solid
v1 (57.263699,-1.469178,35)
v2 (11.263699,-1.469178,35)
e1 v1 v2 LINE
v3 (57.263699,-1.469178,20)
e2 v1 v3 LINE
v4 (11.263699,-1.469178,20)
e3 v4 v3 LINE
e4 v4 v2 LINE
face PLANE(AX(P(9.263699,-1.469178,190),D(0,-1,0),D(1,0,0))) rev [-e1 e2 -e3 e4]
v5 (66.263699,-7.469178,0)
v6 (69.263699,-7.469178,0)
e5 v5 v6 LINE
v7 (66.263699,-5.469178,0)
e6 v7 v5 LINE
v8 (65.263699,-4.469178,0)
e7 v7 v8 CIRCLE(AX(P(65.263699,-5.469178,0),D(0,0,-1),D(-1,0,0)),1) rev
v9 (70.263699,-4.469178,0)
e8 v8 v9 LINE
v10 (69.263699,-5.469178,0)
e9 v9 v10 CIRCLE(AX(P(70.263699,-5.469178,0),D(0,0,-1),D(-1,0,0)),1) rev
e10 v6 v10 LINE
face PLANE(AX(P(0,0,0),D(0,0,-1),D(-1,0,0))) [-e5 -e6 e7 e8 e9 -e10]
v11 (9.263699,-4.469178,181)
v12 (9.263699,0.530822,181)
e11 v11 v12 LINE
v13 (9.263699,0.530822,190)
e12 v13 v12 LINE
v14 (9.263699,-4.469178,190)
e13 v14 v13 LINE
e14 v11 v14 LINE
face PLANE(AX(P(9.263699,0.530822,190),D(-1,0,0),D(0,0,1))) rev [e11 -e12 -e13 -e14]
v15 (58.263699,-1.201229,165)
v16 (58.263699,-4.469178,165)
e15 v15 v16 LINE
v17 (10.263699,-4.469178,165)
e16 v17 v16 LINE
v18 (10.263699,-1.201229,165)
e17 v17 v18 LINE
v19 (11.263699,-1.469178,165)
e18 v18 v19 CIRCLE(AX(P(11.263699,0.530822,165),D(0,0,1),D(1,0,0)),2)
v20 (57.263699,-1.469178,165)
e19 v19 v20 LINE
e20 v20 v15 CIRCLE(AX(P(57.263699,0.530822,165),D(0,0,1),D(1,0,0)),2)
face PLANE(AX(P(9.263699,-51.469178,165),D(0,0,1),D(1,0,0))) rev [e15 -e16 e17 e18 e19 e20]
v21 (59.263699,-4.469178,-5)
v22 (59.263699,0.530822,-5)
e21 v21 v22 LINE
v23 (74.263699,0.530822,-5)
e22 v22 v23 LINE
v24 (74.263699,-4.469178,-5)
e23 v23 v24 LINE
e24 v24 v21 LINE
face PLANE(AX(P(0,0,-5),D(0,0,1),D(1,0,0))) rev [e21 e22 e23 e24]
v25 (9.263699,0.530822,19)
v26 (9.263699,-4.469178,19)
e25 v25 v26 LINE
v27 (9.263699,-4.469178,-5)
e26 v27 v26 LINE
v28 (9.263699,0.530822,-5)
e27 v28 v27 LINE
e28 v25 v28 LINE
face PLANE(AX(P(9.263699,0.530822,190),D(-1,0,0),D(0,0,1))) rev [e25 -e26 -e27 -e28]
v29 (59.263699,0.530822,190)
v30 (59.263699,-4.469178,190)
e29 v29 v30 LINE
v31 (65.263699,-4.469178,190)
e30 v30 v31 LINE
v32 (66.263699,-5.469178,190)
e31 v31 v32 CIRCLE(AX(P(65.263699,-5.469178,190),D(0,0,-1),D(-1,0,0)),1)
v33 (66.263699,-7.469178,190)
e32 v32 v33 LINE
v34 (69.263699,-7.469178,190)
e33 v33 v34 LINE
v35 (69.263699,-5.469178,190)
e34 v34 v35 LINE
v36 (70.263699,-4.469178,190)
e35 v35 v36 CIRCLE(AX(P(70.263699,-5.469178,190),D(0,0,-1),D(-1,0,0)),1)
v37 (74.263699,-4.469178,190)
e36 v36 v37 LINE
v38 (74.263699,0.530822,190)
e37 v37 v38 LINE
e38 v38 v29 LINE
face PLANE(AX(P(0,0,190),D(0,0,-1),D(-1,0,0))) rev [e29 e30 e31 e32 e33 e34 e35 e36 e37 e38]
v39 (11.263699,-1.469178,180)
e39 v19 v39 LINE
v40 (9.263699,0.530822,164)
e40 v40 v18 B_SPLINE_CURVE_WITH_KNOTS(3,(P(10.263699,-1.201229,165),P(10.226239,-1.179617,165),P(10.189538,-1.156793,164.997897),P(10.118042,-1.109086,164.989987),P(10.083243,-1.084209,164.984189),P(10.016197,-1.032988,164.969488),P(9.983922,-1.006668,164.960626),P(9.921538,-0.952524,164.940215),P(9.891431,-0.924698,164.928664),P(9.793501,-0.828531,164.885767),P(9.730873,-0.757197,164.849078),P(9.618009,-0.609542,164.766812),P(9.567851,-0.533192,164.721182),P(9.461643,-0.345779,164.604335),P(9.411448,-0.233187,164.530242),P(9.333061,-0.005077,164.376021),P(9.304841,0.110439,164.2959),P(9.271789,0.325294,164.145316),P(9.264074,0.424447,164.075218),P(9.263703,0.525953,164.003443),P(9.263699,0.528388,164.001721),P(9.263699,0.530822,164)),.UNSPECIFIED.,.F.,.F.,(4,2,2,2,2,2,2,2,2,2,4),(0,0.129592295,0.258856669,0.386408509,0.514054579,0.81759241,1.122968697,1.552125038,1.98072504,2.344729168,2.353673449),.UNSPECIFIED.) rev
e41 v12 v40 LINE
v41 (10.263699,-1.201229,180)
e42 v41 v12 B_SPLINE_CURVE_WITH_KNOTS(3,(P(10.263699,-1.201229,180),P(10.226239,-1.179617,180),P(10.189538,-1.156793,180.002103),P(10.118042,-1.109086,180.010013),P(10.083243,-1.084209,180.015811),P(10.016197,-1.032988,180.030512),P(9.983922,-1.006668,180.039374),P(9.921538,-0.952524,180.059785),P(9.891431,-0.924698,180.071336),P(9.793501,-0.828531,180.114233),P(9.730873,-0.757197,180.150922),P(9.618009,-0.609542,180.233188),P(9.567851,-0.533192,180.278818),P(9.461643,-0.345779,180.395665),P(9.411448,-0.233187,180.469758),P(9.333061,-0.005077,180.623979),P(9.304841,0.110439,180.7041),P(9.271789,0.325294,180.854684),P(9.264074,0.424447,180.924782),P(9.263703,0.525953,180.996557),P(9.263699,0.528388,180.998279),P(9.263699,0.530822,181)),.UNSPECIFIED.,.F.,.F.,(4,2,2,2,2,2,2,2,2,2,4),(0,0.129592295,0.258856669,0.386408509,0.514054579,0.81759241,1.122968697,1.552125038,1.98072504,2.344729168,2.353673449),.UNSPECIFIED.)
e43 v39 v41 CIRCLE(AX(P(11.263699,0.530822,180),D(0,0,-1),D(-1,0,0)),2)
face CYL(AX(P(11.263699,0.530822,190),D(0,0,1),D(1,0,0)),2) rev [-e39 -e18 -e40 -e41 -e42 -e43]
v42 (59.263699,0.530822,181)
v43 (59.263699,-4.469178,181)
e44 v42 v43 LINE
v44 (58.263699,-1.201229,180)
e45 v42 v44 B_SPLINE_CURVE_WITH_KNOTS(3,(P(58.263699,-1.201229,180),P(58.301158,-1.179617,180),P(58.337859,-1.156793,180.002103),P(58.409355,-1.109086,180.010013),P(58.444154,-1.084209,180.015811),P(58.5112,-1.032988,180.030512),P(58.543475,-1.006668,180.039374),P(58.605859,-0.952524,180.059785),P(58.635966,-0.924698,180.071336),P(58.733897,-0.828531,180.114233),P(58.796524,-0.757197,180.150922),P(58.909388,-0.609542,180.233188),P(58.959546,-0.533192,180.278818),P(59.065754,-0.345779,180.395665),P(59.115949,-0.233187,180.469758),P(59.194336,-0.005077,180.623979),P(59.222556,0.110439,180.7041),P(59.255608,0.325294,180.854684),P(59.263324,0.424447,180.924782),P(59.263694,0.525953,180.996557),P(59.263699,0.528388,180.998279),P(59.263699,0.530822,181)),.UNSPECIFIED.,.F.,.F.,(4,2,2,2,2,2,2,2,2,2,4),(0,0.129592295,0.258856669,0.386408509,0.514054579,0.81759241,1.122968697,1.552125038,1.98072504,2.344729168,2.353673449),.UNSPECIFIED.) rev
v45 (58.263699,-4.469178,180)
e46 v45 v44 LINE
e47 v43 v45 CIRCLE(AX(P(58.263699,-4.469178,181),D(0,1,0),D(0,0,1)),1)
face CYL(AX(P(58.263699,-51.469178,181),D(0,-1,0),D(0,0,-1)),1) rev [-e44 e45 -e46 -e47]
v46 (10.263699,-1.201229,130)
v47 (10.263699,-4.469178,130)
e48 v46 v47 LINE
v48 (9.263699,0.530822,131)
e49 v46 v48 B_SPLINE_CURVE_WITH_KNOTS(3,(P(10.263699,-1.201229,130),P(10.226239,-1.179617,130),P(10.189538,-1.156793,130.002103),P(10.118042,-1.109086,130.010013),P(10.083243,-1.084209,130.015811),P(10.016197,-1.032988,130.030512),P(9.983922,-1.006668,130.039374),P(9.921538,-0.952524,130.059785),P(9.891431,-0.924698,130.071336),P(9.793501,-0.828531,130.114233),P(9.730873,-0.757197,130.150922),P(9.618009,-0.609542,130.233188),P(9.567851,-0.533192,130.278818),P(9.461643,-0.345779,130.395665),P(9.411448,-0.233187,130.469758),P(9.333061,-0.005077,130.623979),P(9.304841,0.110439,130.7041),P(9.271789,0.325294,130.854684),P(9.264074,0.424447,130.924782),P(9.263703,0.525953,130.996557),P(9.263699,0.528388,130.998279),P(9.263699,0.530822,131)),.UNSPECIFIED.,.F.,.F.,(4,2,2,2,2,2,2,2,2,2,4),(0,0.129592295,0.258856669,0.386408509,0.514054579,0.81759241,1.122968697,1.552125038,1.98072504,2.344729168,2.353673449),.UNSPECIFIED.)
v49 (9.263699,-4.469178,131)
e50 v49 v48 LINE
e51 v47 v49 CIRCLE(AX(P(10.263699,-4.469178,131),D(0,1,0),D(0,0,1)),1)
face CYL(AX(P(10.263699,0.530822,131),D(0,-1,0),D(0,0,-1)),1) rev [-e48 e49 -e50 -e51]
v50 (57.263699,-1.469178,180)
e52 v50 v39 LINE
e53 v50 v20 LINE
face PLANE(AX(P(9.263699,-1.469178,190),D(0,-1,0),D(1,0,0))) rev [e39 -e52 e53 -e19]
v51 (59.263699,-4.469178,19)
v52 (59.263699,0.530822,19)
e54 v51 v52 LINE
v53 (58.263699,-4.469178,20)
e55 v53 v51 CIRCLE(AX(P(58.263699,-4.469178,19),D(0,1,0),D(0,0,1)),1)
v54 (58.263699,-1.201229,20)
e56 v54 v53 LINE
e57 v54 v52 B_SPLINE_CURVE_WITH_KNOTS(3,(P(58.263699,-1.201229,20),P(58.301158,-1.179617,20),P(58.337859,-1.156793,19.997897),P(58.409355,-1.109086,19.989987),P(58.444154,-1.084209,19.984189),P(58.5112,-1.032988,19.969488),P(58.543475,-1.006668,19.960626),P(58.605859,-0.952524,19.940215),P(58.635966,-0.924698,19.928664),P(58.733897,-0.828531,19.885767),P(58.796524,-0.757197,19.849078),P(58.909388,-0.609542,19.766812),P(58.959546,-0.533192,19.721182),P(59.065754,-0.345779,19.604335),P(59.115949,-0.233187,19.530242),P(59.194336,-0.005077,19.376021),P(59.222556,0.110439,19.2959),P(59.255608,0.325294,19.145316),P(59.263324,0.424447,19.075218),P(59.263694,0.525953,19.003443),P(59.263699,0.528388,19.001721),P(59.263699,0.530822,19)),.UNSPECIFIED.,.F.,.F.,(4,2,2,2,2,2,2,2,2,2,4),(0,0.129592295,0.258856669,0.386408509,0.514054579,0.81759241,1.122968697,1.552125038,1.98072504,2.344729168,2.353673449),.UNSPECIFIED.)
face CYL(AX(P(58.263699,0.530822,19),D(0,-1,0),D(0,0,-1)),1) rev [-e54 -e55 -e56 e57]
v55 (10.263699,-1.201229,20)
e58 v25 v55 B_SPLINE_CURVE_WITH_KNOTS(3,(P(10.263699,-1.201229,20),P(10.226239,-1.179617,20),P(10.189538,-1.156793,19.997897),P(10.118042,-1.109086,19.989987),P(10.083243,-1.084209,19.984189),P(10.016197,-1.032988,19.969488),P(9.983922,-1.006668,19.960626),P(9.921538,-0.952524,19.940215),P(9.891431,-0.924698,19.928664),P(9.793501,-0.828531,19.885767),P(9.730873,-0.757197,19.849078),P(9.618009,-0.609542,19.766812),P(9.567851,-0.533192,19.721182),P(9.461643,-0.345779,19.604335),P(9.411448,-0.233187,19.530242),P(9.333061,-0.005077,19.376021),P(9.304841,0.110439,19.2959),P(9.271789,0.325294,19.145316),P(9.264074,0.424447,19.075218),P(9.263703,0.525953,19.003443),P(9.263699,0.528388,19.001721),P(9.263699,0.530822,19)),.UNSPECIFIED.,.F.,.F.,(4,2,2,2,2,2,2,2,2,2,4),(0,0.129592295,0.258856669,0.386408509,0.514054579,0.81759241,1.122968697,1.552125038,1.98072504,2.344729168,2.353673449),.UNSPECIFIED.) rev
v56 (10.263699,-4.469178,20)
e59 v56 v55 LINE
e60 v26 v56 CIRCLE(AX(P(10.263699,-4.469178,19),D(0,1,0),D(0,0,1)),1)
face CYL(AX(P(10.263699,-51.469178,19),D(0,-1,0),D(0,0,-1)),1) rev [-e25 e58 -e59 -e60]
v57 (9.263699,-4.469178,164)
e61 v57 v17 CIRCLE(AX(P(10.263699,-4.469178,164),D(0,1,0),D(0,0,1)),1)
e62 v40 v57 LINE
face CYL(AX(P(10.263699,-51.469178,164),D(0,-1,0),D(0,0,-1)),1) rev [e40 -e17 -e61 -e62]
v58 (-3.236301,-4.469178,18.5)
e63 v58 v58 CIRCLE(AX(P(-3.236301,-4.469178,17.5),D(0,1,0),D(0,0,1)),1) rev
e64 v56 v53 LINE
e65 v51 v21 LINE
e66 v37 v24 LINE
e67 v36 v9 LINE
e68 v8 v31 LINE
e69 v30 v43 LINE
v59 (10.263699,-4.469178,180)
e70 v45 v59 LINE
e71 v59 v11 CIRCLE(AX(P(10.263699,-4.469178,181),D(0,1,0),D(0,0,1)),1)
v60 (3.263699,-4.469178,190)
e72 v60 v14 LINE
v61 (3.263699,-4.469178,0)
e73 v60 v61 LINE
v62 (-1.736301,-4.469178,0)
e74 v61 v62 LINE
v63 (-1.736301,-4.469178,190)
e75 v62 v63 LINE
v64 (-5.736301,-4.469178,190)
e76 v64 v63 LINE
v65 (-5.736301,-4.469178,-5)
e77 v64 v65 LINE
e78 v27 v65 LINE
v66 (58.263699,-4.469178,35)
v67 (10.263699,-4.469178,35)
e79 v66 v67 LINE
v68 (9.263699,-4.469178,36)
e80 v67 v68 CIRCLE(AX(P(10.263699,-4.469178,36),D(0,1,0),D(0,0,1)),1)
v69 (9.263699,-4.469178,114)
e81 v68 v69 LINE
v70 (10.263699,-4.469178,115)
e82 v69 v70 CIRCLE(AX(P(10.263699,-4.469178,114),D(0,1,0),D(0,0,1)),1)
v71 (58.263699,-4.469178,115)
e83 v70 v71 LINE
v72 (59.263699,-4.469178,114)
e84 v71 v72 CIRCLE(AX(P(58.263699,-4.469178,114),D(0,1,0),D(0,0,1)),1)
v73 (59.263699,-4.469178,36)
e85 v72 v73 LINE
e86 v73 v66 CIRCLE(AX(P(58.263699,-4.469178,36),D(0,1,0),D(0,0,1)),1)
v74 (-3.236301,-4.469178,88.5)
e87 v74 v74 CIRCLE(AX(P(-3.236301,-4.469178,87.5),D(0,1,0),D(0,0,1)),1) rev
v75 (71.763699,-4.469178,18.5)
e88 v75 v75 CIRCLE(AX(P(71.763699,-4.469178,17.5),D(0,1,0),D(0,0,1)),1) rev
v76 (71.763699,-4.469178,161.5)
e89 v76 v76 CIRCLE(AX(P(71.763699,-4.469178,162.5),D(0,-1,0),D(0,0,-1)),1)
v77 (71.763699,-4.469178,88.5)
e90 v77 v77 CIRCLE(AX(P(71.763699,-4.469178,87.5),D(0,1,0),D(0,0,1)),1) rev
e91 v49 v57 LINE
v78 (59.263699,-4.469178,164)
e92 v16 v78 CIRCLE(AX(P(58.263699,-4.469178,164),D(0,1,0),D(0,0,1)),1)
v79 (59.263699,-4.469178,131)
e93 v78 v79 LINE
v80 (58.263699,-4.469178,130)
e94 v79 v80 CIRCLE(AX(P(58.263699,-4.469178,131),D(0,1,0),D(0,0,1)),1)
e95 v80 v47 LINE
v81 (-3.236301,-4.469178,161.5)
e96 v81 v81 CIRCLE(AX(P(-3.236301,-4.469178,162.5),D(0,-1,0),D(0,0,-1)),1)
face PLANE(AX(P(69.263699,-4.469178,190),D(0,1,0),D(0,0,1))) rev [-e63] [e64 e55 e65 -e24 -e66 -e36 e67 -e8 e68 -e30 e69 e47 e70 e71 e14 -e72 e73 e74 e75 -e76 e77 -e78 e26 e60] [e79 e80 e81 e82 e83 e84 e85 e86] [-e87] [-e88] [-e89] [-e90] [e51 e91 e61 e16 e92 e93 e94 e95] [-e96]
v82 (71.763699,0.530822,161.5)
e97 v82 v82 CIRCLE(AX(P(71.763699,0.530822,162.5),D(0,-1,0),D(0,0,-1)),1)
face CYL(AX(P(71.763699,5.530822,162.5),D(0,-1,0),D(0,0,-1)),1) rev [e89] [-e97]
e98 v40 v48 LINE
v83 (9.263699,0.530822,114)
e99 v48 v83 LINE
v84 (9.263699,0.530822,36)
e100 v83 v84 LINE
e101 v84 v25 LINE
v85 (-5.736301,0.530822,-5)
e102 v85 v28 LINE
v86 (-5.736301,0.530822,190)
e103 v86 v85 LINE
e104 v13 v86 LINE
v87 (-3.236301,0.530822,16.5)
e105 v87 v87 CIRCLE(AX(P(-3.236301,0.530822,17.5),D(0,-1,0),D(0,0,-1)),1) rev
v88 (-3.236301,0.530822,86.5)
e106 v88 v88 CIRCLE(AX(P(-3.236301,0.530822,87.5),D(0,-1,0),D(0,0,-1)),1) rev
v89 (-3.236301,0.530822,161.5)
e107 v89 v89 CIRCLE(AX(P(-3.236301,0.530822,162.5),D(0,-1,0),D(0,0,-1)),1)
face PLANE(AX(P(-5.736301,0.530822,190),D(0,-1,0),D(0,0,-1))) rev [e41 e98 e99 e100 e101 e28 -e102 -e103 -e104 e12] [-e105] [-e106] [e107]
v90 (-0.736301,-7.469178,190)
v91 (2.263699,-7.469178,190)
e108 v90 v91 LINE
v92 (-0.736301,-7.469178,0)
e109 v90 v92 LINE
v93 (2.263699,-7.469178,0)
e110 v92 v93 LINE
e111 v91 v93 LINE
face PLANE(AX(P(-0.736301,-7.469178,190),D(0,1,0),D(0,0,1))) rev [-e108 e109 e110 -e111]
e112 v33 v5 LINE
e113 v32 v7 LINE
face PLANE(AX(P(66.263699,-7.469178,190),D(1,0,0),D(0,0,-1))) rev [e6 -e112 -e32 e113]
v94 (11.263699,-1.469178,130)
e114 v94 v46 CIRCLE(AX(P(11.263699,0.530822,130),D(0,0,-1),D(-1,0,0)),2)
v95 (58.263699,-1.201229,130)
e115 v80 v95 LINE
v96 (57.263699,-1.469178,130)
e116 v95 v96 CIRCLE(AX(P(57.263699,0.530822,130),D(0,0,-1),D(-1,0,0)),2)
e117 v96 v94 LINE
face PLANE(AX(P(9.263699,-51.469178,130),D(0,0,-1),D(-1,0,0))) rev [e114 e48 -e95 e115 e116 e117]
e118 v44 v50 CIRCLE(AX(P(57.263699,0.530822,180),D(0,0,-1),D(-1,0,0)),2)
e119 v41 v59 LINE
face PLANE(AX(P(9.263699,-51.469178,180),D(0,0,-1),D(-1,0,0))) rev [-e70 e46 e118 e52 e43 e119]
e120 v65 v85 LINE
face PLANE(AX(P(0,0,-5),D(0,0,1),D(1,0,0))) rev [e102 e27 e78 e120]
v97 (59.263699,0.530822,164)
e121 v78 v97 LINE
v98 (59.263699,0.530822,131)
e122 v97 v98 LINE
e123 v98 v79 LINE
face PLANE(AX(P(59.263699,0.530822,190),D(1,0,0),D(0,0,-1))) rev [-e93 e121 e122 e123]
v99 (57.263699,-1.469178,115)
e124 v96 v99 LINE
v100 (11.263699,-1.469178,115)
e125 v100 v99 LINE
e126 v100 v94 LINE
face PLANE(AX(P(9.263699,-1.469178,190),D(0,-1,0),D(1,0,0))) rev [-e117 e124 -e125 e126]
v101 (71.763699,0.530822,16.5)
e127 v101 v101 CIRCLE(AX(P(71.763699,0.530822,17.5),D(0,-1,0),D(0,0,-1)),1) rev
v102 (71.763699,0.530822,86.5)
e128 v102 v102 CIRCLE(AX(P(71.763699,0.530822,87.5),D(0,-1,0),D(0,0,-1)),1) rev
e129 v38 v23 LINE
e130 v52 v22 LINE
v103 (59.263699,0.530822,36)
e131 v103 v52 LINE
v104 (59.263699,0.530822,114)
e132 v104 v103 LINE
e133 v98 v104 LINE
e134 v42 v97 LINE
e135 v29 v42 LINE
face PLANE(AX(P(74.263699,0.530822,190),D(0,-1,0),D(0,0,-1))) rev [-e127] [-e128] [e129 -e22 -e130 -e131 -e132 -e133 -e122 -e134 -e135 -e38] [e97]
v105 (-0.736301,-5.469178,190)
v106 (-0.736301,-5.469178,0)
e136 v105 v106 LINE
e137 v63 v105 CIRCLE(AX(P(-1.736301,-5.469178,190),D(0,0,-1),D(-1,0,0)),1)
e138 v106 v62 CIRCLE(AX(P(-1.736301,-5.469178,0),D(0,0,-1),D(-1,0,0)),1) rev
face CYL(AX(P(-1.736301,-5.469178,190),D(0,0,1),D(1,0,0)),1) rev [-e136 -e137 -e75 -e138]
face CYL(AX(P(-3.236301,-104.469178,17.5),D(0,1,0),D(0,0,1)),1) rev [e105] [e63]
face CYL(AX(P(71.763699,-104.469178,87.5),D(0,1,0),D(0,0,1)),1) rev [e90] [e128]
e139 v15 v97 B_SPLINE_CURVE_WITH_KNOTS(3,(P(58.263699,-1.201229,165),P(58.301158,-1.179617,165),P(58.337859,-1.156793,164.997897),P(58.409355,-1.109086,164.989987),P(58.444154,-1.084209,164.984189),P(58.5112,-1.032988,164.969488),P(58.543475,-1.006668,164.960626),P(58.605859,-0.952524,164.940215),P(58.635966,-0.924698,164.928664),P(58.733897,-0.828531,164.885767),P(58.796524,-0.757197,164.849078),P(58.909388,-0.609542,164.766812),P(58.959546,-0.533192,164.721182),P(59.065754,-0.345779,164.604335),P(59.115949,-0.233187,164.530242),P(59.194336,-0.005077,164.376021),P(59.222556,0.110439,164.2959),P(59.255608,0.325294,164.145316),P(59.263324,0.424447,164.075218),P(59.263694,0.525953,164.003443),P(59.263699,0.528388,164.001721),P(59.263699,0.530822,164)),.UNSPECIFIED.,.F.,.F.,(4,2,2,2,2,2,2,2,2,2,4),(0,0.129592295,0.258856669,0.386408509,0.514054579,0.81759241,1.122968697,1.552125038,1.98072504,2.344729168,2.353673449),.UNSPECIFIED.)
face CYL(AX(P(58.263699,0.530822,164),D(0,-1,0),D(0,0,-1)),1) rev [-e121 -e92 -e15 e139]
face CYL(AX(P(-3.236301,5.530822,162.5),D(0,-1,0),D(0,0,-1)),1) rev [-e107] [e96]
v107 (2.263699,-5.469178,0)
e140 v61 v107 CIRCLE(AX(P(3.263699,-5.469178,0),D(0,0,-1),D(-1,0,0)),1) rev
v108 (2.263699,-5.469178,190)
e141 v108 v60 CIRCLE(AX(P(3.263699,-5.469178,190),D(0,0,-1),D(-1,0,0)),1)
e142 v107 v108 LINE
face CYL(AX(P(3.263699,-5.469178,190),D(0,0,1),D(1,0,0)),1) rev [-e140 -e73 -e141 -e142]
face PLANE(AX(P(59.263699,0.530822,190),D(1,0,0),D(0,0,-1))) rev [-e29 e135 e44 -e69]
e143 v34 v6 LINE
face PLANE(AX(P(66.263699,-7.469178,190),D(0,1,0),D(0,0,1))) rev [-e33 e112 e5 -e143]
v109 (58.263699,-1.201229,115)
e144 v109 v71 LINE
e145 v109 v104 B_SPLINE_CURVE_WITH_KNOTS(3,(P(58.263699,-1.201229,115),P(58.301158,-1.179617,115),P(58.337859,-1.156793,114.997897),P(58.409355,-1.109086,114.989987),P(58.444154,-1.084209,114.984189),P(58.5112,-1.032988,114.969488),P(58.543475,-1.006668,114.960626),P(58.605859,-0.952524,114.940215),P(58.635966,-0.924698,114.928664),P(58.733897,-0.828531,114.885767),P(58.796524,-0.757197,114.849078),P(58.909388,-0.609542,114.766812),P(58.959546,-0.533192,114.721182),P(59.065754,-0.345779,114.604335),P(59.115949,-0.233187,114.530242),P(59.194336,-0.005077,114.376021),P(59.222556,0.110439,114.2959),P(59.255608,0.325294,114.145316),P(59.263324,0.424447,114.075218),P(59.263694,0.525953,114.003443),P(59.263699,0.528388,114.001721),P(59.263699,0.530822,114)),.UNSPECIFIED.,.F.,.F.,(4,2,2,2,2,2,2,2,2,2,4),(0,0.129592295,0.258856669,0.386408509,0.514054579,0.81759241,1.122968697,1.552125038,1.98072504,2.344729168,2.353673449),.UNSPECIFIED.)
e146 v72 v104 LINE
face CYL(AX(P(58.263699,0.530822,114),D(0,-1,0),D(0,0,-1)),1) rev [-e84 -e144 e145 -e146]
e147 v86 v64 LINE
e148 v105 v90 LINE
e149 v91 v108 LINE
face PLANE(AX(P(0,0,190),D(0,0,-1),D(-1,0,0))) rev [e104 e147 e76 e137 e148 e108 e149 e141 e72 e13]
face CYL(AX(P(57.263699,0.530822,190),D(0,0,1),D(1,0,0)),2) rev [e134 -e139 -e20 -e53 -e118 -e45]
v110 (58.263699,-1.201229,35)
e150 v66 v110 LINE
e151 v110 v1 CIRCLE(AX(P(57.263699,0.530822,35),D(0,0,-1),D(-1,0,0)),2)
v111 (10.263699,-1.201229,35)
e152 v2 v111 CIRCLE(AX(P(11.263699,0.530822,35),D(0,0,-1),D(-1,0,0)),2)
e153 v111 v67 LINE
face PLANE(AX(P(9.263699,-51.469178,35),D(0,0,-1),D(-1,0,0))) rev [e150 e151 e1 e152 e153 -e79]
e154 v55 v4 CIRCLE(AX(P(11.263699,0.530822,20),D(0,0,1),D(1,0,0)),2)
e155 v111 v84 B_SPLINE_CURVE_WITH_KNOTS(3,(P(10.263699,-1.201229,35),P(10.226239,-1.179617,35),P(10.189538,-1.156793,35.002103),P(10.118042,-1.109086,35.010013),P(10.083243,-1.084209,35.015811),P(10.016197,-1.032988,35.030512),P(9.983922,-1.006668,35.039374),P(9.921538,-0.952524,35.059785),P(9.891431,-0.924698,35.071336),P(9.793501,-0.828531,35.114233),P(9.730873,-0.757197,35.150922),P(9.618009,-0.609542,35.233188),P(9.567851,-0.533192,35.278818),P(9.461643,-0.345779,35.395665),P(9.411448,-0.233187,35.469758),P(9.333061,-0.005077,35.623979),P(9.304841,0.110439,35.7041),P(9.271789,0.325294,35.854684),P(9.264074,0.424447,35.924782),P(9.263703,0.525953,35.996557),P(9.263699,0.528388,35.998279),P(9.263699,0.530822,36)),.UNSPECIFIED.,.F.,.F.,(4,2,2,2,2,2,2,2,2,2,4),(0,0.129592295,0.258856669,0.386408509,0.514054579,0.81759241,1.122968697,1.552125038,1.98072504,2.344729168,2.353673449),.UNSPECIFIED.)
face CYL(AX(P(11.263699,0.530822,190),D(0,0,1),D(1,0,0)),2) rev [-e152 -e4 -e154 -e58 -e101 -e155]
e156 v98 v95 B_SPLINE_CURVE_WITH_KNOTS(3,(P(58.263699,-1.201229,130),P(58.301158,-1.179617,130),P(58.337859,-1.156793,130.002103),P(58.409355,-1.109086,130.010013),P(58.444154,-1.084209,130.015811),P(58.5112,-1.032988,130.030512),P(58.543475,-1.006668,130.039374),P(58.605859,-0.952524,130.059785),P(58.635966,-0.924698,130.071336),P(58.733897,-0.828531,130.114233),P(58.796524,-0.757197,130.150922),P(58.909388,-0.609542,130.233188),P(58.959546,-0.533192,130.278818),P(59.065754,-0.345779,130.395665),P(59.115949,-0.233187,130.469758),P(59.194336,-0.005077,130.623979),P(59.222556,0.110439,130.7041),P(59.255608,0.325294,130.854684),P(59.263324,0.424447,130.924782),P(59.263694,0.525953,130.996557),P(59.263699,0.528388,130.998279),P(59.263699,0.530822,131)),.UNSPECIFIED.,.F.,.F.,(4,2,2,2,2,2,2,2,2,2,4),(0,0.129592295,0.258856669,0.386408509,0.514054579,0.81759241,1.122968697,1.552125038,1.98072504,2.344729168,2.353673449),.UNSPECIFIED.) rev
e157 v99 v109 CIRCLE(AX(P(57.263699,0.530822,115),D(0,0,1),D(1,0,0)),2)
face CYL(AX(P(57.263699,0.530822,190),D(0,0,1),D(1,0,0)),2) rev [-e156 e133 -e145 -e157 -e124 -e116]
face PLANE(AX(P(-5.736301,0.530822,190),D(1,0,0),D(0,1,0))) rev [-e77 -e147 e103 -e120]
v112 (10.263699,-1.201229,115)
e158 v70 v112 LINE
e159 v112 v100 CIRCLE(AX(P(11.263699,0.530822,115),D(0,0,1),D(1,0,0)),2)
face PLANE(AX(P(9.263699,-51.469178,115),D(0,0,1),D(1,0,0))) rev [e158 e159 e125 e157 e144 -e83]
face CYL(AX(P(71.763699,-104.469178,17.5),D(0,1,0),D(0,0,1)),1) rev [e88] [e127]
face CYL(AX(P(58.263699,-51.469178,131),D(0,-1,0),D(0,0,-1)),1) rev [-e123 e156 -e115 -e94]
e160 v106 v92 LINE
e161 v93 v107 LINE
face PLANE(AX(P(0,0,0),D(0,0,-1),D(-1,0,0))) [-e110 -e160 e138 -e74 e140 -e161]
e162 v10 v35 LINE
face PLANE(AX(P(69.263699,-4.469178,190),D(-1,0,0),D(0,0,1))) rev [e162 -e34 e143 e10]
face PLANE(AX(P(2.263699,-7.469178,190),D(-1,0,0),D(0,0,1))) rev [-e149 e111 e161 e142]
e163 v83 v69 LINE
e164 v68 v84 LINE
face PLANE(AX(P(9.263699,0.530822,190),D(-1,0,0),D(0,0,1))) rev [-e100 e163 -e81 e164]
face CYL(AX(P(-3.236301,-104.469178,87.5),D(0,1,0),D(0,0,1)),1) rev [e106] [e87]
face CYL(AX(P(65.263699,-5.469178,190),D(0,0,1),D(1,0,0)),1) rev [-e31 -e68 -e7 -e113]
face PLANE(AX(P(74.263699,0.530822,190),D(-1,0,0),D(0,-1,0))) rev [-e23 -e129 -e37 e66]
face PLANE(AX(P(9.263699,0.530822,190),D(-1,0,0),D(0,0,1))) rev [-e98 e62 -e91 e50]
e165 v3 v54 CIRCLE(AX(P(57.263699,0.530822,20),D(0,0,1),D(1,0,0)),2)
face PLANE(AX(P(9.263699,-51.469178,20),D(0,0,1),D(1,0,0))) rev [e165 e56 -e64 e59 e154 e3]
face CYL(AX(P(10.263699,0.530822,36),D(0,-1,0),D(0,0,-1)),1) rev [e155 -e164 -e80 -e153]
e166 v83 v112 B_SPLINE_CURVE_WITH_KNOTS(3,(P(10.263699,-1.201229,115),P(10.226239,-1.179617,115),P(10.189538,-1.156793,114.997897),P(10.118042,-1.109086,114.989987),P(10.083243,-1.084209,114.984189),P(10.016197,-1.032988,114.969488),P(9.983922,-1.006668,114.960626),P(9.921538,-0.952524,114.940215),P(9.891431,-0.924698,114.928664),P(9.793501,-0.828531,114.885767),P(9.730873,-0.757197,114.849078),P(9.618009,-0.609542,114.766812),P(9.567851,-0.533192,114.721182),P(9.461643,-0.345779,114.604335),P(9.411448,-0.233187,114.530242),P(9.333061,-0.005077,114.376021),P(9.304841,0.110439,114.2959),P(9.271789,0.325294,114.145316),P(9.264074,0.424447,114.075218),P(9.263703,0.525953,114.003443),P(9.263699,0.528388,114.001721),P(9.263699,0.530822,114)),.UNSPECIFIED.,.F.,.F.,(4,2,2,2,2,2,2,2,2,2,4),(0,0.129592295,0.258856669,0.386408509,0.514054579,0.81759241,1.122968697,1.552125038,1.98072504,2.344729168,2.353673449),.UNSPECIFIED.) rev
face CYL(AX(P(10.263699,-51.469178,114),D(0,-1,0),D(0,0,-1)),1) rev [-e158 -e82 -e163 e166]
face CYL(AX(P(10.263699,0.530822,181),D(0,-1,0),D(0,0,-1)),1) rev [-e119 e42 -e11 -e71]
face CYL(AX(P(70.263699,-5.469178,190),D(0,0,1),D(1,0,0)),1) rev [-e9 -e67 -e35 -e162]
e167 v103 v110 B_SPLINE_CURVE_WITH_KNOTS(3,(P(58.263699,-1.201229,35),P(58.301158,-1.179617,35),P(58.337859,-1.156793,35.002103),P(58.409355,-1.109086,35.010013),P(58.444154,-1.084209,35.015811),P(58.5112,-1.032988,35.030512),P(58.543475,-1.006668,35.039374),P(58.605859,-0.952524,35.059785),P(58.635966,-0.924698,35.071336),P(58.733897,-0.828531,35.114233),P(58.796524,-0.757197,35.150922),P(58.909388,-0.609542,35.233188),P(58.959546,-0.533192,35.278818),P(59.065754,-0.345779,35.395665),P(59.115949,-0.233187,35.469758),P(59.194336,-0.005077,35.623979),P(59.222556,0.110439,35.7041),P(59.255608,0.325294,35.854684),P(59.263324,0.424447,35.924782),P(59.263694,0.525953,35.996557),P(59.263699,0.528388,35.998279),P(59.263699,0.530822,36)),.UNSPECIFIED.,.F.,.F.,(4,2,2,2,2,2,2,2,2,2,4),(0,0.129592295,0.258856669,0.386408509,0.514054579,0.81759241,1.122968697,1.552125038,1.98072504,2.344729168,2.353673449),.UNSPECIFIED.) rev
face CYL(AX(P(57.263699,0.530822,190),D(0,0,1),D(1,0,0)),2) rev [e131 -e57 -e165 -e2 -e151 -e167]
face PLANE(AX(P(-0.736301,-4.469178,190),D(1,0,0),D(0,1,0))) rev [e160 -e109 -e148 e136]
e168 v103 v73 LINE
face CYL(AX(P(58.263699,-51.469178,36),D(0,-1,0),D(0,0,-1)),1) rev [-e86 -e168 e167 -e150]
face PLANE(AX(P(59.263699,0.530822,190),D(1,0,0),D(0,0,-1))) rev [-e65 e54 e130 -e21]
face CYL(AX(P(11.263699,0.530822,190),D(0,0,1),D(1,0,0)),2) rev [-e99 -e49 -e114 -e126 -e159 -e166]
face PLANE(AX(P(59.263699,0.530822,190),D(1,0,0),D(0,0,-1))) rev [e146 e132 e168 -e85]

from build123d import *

# Parameters (mm, degrees)
BOSS_EXTRUDE1_DEPTH     = 190
SKETCH2_W               = 50
SKETCH2_H               = 20
CUT_EXTRUDE1_DEPTH      = 50
SKETCH3_W               = 50
SKETCH3_H               = 80
CUT_EXTRUDE2_DEPTH      = 50
SKETCH4_W               = 50
SKETCH4_H               = 35
CUT_EXTRUDE4_DEPTH      = 50
SKETCH9_W               = 15
SKETCH9_H               = 5
BOSS_EXTRUDE4_DEPTH     = 5
SKETCH5_R               = 1
CUT_EXTRUDE5_DEPTH      = 10
CUT_EXTRUDE6_DEPTH      = 100
CUT_EXTRUDE6_DEPTH_BACK = 10
SKETCH6_R               = 1
FILLET1_R               = 1
FILLET2_R               = 2


with BuildPart() as part:
    # Sketch1 → Boss-Extrude1 (new body)
    with BuildSketch(Plane.XY):
        Polygon((-5.73630137, 0.530821918), (9.26369863, 0.530821918), (9.26369863, -1.469178082), (59.26369863, -1.469178082), (59.26369863, 0.530821918), (74.26369863, 0.530821918), (74.26369863, -4.469178082), (69.26369863, -4.469178082), (69.26369863, -7.469178082), (66.26369863, -7.469178082), (66.26369863, -4.469178082), (2.26369863, -4.469178082), (2.26369863, -7.469178082), (-0.73630137, -7.469178082), (-0.73630137, -4.469178082), (-5.73630137, -4.469178082), align=None)
    extrude(amount=BOSS_EXTRUDE1_DEPTH)

    # Sketch2 → Cut-Extrude1 (cut)
    with BuildSketch(Plane(origin=(0, -1.469178082, 0), x_dir=(1, 0, 0), z_dir=(0, 1, 0))):
        with Locations((34.26369863, -10)):
            Rectangle(SKETCH2_W, SKETCH2_H)
        with Locations((34.26369863, -190)):
            Rectangle(SKETCH2_W, SKETCH2_H)
    extrude(amount=-CUT_EXTRUDE1_DEPTH, mode=Mode.SUBTRACT)

    # Sketch3 → Cut-Extrude2 (cut)
    with BuildSketch(Plane(origin=(0, -1.469178082, 0), x_dir=(1, 0, 0), z_dir=(0, 1, 0))):
        with Locations((34.26369863, -75)):
            Rectangle(SKETCH3_W, SKETCH3_H)
    extrude(amount=-CUT_EXTRUDE2_DEPTH, mode=Mode.SUBTRACT)

    # Sketch4 → Cut-Extrude4 (cut)
    with BuildSketch(Plane(origin=(0, -1.469178082, 0), x_dir=(1, 0, 0), z_dir=(0, 1, 0))):
        with Locations((34.26369863, -147.5)):
            Rectangle(SKETCH4_W, SKETCH4_H)
    extrude(amount=-CUT_EXTRUDE4_DEPTH, mode=Mode.SUBTRACT)

    # Sketch9 → Boss-Extrude4 (add)
    with BuildSketch(Plane(origin=(0, 0, 0), x_dir=(-1, 0, 0), z_dir=(0, 0, -1))):
        with Locations((-66.76369863, -1.969178082)):
            Rectangle(SKETCH9_W, SKETCH9_H)
        with Locations((-1.76369863, -1.969178082)):
            Rectangle(SKETCH9_W, SKETCH9_H)
    extrude(amount=BOSS_EXTRUDE4_DEPTH)

    # Sketch5 → Cut-Extrude5 (cut)
    with BuildSketch(Plane(origin=(0, -4.469178082, 0), x_dir=(-1, 0, 0), z_dir=(0, -1, 0))):
        with Locations(Location((-71.76369863, -162.5, 0), (0, 0, 90))):
            Circle(SKETCH5_R)
        with Locations(Location((3.23630137, -162.5, 0), (0, 0, 90))):
            Circle(SKETCH5_R)
    extrude(amount=-CUT_EXTRUDE5_DEPTH, mode=Mode.SUBTRACT)

    # Sketch6 → Cut-Extrude6 (cut, two sides: drawn at the far end of the back side and taken through both)
    with BuildSketch(Plane(origin=(0, -4.469178082, 0), x_dir=(-1, 0, 0), z_dir=(0, -1, 0)).offset(-CUT_EXTRUDE6_DEPTH_BACK)):
        with Locations(Location((3.23630137, -87.5, 0), (0, 0, 270))):
            Circle(SKETCH6_R)
        with Locations(Location((3.23630137, -17.5, 0), (0, 0, 270))):
            Circle(SKETCH6_R)
        with Locations(Location((-71.76369863, -17.5, 0), (0, 0, 270))):
            Circle(SKETCH6_R)
        with Locations(Location((-71.76369863, -87.5, 0), (0, 0, 270))):
            Circle(SKETCH6_R)
    extrude(amount=CUT_EXTRUDE6_DEPTH + CUT_EXTRUDE6_DEPTH_BACK, mode=Mode.SUBTRACT)

    # Fillet1
    fillet1_edges = [part.edges().sort_by_distance(p)[0] for p in [
        (9.26369863, -2.969178082, 165),
        (59.26369863, -2.969178082, 130),
        (9.26369863, -2.969178082, 130),
        (59.26369863, -2.969178082, 165),
        (69.26369863, -4.469178082, 95),
        (66.26369863, -4.469178082, 95),
        (2.26369863, -4.469178082, 95),
        (-0.73630137, -4.469178082, 95),
        (59.26369863, -2.969178082, 20),
        (9.26369863, -2.969178082, 20),
        (9.26369863, -2.969178082, 180),
        (59.26369863, -2.969178082, 180),
        (9.26369863, -2.969178082, 115),
        (59.26369863, -2.969178082, 35),
        (9.26369863, -2.969178082, 35),
        (59.26369863, -2.969178082, 115),
    ]]
    fillet(fillet1_edges, radius=FILLET1_R)

    # Fillet2
    fillet2_edges = [part.edges().sort_by_distance(p)[0] for p in [
        (59.26369863, -1.469178082, 27.5),
        (9.26369863, -1.469178082, 27.5),
        (9.26369863, -1.469178082, 172.5),
        (59.26369863, -1.469178082, 172.5),
        (59.26369863, -1.469178082, 122.5),
        (9.26369863, -1.469178082, 122.5),
    ]]
    fillet(fillet2_edges, radius=FILLET2_R - 0.0001)  # a hair under: the kernel refuses the full size


solid = part.part
